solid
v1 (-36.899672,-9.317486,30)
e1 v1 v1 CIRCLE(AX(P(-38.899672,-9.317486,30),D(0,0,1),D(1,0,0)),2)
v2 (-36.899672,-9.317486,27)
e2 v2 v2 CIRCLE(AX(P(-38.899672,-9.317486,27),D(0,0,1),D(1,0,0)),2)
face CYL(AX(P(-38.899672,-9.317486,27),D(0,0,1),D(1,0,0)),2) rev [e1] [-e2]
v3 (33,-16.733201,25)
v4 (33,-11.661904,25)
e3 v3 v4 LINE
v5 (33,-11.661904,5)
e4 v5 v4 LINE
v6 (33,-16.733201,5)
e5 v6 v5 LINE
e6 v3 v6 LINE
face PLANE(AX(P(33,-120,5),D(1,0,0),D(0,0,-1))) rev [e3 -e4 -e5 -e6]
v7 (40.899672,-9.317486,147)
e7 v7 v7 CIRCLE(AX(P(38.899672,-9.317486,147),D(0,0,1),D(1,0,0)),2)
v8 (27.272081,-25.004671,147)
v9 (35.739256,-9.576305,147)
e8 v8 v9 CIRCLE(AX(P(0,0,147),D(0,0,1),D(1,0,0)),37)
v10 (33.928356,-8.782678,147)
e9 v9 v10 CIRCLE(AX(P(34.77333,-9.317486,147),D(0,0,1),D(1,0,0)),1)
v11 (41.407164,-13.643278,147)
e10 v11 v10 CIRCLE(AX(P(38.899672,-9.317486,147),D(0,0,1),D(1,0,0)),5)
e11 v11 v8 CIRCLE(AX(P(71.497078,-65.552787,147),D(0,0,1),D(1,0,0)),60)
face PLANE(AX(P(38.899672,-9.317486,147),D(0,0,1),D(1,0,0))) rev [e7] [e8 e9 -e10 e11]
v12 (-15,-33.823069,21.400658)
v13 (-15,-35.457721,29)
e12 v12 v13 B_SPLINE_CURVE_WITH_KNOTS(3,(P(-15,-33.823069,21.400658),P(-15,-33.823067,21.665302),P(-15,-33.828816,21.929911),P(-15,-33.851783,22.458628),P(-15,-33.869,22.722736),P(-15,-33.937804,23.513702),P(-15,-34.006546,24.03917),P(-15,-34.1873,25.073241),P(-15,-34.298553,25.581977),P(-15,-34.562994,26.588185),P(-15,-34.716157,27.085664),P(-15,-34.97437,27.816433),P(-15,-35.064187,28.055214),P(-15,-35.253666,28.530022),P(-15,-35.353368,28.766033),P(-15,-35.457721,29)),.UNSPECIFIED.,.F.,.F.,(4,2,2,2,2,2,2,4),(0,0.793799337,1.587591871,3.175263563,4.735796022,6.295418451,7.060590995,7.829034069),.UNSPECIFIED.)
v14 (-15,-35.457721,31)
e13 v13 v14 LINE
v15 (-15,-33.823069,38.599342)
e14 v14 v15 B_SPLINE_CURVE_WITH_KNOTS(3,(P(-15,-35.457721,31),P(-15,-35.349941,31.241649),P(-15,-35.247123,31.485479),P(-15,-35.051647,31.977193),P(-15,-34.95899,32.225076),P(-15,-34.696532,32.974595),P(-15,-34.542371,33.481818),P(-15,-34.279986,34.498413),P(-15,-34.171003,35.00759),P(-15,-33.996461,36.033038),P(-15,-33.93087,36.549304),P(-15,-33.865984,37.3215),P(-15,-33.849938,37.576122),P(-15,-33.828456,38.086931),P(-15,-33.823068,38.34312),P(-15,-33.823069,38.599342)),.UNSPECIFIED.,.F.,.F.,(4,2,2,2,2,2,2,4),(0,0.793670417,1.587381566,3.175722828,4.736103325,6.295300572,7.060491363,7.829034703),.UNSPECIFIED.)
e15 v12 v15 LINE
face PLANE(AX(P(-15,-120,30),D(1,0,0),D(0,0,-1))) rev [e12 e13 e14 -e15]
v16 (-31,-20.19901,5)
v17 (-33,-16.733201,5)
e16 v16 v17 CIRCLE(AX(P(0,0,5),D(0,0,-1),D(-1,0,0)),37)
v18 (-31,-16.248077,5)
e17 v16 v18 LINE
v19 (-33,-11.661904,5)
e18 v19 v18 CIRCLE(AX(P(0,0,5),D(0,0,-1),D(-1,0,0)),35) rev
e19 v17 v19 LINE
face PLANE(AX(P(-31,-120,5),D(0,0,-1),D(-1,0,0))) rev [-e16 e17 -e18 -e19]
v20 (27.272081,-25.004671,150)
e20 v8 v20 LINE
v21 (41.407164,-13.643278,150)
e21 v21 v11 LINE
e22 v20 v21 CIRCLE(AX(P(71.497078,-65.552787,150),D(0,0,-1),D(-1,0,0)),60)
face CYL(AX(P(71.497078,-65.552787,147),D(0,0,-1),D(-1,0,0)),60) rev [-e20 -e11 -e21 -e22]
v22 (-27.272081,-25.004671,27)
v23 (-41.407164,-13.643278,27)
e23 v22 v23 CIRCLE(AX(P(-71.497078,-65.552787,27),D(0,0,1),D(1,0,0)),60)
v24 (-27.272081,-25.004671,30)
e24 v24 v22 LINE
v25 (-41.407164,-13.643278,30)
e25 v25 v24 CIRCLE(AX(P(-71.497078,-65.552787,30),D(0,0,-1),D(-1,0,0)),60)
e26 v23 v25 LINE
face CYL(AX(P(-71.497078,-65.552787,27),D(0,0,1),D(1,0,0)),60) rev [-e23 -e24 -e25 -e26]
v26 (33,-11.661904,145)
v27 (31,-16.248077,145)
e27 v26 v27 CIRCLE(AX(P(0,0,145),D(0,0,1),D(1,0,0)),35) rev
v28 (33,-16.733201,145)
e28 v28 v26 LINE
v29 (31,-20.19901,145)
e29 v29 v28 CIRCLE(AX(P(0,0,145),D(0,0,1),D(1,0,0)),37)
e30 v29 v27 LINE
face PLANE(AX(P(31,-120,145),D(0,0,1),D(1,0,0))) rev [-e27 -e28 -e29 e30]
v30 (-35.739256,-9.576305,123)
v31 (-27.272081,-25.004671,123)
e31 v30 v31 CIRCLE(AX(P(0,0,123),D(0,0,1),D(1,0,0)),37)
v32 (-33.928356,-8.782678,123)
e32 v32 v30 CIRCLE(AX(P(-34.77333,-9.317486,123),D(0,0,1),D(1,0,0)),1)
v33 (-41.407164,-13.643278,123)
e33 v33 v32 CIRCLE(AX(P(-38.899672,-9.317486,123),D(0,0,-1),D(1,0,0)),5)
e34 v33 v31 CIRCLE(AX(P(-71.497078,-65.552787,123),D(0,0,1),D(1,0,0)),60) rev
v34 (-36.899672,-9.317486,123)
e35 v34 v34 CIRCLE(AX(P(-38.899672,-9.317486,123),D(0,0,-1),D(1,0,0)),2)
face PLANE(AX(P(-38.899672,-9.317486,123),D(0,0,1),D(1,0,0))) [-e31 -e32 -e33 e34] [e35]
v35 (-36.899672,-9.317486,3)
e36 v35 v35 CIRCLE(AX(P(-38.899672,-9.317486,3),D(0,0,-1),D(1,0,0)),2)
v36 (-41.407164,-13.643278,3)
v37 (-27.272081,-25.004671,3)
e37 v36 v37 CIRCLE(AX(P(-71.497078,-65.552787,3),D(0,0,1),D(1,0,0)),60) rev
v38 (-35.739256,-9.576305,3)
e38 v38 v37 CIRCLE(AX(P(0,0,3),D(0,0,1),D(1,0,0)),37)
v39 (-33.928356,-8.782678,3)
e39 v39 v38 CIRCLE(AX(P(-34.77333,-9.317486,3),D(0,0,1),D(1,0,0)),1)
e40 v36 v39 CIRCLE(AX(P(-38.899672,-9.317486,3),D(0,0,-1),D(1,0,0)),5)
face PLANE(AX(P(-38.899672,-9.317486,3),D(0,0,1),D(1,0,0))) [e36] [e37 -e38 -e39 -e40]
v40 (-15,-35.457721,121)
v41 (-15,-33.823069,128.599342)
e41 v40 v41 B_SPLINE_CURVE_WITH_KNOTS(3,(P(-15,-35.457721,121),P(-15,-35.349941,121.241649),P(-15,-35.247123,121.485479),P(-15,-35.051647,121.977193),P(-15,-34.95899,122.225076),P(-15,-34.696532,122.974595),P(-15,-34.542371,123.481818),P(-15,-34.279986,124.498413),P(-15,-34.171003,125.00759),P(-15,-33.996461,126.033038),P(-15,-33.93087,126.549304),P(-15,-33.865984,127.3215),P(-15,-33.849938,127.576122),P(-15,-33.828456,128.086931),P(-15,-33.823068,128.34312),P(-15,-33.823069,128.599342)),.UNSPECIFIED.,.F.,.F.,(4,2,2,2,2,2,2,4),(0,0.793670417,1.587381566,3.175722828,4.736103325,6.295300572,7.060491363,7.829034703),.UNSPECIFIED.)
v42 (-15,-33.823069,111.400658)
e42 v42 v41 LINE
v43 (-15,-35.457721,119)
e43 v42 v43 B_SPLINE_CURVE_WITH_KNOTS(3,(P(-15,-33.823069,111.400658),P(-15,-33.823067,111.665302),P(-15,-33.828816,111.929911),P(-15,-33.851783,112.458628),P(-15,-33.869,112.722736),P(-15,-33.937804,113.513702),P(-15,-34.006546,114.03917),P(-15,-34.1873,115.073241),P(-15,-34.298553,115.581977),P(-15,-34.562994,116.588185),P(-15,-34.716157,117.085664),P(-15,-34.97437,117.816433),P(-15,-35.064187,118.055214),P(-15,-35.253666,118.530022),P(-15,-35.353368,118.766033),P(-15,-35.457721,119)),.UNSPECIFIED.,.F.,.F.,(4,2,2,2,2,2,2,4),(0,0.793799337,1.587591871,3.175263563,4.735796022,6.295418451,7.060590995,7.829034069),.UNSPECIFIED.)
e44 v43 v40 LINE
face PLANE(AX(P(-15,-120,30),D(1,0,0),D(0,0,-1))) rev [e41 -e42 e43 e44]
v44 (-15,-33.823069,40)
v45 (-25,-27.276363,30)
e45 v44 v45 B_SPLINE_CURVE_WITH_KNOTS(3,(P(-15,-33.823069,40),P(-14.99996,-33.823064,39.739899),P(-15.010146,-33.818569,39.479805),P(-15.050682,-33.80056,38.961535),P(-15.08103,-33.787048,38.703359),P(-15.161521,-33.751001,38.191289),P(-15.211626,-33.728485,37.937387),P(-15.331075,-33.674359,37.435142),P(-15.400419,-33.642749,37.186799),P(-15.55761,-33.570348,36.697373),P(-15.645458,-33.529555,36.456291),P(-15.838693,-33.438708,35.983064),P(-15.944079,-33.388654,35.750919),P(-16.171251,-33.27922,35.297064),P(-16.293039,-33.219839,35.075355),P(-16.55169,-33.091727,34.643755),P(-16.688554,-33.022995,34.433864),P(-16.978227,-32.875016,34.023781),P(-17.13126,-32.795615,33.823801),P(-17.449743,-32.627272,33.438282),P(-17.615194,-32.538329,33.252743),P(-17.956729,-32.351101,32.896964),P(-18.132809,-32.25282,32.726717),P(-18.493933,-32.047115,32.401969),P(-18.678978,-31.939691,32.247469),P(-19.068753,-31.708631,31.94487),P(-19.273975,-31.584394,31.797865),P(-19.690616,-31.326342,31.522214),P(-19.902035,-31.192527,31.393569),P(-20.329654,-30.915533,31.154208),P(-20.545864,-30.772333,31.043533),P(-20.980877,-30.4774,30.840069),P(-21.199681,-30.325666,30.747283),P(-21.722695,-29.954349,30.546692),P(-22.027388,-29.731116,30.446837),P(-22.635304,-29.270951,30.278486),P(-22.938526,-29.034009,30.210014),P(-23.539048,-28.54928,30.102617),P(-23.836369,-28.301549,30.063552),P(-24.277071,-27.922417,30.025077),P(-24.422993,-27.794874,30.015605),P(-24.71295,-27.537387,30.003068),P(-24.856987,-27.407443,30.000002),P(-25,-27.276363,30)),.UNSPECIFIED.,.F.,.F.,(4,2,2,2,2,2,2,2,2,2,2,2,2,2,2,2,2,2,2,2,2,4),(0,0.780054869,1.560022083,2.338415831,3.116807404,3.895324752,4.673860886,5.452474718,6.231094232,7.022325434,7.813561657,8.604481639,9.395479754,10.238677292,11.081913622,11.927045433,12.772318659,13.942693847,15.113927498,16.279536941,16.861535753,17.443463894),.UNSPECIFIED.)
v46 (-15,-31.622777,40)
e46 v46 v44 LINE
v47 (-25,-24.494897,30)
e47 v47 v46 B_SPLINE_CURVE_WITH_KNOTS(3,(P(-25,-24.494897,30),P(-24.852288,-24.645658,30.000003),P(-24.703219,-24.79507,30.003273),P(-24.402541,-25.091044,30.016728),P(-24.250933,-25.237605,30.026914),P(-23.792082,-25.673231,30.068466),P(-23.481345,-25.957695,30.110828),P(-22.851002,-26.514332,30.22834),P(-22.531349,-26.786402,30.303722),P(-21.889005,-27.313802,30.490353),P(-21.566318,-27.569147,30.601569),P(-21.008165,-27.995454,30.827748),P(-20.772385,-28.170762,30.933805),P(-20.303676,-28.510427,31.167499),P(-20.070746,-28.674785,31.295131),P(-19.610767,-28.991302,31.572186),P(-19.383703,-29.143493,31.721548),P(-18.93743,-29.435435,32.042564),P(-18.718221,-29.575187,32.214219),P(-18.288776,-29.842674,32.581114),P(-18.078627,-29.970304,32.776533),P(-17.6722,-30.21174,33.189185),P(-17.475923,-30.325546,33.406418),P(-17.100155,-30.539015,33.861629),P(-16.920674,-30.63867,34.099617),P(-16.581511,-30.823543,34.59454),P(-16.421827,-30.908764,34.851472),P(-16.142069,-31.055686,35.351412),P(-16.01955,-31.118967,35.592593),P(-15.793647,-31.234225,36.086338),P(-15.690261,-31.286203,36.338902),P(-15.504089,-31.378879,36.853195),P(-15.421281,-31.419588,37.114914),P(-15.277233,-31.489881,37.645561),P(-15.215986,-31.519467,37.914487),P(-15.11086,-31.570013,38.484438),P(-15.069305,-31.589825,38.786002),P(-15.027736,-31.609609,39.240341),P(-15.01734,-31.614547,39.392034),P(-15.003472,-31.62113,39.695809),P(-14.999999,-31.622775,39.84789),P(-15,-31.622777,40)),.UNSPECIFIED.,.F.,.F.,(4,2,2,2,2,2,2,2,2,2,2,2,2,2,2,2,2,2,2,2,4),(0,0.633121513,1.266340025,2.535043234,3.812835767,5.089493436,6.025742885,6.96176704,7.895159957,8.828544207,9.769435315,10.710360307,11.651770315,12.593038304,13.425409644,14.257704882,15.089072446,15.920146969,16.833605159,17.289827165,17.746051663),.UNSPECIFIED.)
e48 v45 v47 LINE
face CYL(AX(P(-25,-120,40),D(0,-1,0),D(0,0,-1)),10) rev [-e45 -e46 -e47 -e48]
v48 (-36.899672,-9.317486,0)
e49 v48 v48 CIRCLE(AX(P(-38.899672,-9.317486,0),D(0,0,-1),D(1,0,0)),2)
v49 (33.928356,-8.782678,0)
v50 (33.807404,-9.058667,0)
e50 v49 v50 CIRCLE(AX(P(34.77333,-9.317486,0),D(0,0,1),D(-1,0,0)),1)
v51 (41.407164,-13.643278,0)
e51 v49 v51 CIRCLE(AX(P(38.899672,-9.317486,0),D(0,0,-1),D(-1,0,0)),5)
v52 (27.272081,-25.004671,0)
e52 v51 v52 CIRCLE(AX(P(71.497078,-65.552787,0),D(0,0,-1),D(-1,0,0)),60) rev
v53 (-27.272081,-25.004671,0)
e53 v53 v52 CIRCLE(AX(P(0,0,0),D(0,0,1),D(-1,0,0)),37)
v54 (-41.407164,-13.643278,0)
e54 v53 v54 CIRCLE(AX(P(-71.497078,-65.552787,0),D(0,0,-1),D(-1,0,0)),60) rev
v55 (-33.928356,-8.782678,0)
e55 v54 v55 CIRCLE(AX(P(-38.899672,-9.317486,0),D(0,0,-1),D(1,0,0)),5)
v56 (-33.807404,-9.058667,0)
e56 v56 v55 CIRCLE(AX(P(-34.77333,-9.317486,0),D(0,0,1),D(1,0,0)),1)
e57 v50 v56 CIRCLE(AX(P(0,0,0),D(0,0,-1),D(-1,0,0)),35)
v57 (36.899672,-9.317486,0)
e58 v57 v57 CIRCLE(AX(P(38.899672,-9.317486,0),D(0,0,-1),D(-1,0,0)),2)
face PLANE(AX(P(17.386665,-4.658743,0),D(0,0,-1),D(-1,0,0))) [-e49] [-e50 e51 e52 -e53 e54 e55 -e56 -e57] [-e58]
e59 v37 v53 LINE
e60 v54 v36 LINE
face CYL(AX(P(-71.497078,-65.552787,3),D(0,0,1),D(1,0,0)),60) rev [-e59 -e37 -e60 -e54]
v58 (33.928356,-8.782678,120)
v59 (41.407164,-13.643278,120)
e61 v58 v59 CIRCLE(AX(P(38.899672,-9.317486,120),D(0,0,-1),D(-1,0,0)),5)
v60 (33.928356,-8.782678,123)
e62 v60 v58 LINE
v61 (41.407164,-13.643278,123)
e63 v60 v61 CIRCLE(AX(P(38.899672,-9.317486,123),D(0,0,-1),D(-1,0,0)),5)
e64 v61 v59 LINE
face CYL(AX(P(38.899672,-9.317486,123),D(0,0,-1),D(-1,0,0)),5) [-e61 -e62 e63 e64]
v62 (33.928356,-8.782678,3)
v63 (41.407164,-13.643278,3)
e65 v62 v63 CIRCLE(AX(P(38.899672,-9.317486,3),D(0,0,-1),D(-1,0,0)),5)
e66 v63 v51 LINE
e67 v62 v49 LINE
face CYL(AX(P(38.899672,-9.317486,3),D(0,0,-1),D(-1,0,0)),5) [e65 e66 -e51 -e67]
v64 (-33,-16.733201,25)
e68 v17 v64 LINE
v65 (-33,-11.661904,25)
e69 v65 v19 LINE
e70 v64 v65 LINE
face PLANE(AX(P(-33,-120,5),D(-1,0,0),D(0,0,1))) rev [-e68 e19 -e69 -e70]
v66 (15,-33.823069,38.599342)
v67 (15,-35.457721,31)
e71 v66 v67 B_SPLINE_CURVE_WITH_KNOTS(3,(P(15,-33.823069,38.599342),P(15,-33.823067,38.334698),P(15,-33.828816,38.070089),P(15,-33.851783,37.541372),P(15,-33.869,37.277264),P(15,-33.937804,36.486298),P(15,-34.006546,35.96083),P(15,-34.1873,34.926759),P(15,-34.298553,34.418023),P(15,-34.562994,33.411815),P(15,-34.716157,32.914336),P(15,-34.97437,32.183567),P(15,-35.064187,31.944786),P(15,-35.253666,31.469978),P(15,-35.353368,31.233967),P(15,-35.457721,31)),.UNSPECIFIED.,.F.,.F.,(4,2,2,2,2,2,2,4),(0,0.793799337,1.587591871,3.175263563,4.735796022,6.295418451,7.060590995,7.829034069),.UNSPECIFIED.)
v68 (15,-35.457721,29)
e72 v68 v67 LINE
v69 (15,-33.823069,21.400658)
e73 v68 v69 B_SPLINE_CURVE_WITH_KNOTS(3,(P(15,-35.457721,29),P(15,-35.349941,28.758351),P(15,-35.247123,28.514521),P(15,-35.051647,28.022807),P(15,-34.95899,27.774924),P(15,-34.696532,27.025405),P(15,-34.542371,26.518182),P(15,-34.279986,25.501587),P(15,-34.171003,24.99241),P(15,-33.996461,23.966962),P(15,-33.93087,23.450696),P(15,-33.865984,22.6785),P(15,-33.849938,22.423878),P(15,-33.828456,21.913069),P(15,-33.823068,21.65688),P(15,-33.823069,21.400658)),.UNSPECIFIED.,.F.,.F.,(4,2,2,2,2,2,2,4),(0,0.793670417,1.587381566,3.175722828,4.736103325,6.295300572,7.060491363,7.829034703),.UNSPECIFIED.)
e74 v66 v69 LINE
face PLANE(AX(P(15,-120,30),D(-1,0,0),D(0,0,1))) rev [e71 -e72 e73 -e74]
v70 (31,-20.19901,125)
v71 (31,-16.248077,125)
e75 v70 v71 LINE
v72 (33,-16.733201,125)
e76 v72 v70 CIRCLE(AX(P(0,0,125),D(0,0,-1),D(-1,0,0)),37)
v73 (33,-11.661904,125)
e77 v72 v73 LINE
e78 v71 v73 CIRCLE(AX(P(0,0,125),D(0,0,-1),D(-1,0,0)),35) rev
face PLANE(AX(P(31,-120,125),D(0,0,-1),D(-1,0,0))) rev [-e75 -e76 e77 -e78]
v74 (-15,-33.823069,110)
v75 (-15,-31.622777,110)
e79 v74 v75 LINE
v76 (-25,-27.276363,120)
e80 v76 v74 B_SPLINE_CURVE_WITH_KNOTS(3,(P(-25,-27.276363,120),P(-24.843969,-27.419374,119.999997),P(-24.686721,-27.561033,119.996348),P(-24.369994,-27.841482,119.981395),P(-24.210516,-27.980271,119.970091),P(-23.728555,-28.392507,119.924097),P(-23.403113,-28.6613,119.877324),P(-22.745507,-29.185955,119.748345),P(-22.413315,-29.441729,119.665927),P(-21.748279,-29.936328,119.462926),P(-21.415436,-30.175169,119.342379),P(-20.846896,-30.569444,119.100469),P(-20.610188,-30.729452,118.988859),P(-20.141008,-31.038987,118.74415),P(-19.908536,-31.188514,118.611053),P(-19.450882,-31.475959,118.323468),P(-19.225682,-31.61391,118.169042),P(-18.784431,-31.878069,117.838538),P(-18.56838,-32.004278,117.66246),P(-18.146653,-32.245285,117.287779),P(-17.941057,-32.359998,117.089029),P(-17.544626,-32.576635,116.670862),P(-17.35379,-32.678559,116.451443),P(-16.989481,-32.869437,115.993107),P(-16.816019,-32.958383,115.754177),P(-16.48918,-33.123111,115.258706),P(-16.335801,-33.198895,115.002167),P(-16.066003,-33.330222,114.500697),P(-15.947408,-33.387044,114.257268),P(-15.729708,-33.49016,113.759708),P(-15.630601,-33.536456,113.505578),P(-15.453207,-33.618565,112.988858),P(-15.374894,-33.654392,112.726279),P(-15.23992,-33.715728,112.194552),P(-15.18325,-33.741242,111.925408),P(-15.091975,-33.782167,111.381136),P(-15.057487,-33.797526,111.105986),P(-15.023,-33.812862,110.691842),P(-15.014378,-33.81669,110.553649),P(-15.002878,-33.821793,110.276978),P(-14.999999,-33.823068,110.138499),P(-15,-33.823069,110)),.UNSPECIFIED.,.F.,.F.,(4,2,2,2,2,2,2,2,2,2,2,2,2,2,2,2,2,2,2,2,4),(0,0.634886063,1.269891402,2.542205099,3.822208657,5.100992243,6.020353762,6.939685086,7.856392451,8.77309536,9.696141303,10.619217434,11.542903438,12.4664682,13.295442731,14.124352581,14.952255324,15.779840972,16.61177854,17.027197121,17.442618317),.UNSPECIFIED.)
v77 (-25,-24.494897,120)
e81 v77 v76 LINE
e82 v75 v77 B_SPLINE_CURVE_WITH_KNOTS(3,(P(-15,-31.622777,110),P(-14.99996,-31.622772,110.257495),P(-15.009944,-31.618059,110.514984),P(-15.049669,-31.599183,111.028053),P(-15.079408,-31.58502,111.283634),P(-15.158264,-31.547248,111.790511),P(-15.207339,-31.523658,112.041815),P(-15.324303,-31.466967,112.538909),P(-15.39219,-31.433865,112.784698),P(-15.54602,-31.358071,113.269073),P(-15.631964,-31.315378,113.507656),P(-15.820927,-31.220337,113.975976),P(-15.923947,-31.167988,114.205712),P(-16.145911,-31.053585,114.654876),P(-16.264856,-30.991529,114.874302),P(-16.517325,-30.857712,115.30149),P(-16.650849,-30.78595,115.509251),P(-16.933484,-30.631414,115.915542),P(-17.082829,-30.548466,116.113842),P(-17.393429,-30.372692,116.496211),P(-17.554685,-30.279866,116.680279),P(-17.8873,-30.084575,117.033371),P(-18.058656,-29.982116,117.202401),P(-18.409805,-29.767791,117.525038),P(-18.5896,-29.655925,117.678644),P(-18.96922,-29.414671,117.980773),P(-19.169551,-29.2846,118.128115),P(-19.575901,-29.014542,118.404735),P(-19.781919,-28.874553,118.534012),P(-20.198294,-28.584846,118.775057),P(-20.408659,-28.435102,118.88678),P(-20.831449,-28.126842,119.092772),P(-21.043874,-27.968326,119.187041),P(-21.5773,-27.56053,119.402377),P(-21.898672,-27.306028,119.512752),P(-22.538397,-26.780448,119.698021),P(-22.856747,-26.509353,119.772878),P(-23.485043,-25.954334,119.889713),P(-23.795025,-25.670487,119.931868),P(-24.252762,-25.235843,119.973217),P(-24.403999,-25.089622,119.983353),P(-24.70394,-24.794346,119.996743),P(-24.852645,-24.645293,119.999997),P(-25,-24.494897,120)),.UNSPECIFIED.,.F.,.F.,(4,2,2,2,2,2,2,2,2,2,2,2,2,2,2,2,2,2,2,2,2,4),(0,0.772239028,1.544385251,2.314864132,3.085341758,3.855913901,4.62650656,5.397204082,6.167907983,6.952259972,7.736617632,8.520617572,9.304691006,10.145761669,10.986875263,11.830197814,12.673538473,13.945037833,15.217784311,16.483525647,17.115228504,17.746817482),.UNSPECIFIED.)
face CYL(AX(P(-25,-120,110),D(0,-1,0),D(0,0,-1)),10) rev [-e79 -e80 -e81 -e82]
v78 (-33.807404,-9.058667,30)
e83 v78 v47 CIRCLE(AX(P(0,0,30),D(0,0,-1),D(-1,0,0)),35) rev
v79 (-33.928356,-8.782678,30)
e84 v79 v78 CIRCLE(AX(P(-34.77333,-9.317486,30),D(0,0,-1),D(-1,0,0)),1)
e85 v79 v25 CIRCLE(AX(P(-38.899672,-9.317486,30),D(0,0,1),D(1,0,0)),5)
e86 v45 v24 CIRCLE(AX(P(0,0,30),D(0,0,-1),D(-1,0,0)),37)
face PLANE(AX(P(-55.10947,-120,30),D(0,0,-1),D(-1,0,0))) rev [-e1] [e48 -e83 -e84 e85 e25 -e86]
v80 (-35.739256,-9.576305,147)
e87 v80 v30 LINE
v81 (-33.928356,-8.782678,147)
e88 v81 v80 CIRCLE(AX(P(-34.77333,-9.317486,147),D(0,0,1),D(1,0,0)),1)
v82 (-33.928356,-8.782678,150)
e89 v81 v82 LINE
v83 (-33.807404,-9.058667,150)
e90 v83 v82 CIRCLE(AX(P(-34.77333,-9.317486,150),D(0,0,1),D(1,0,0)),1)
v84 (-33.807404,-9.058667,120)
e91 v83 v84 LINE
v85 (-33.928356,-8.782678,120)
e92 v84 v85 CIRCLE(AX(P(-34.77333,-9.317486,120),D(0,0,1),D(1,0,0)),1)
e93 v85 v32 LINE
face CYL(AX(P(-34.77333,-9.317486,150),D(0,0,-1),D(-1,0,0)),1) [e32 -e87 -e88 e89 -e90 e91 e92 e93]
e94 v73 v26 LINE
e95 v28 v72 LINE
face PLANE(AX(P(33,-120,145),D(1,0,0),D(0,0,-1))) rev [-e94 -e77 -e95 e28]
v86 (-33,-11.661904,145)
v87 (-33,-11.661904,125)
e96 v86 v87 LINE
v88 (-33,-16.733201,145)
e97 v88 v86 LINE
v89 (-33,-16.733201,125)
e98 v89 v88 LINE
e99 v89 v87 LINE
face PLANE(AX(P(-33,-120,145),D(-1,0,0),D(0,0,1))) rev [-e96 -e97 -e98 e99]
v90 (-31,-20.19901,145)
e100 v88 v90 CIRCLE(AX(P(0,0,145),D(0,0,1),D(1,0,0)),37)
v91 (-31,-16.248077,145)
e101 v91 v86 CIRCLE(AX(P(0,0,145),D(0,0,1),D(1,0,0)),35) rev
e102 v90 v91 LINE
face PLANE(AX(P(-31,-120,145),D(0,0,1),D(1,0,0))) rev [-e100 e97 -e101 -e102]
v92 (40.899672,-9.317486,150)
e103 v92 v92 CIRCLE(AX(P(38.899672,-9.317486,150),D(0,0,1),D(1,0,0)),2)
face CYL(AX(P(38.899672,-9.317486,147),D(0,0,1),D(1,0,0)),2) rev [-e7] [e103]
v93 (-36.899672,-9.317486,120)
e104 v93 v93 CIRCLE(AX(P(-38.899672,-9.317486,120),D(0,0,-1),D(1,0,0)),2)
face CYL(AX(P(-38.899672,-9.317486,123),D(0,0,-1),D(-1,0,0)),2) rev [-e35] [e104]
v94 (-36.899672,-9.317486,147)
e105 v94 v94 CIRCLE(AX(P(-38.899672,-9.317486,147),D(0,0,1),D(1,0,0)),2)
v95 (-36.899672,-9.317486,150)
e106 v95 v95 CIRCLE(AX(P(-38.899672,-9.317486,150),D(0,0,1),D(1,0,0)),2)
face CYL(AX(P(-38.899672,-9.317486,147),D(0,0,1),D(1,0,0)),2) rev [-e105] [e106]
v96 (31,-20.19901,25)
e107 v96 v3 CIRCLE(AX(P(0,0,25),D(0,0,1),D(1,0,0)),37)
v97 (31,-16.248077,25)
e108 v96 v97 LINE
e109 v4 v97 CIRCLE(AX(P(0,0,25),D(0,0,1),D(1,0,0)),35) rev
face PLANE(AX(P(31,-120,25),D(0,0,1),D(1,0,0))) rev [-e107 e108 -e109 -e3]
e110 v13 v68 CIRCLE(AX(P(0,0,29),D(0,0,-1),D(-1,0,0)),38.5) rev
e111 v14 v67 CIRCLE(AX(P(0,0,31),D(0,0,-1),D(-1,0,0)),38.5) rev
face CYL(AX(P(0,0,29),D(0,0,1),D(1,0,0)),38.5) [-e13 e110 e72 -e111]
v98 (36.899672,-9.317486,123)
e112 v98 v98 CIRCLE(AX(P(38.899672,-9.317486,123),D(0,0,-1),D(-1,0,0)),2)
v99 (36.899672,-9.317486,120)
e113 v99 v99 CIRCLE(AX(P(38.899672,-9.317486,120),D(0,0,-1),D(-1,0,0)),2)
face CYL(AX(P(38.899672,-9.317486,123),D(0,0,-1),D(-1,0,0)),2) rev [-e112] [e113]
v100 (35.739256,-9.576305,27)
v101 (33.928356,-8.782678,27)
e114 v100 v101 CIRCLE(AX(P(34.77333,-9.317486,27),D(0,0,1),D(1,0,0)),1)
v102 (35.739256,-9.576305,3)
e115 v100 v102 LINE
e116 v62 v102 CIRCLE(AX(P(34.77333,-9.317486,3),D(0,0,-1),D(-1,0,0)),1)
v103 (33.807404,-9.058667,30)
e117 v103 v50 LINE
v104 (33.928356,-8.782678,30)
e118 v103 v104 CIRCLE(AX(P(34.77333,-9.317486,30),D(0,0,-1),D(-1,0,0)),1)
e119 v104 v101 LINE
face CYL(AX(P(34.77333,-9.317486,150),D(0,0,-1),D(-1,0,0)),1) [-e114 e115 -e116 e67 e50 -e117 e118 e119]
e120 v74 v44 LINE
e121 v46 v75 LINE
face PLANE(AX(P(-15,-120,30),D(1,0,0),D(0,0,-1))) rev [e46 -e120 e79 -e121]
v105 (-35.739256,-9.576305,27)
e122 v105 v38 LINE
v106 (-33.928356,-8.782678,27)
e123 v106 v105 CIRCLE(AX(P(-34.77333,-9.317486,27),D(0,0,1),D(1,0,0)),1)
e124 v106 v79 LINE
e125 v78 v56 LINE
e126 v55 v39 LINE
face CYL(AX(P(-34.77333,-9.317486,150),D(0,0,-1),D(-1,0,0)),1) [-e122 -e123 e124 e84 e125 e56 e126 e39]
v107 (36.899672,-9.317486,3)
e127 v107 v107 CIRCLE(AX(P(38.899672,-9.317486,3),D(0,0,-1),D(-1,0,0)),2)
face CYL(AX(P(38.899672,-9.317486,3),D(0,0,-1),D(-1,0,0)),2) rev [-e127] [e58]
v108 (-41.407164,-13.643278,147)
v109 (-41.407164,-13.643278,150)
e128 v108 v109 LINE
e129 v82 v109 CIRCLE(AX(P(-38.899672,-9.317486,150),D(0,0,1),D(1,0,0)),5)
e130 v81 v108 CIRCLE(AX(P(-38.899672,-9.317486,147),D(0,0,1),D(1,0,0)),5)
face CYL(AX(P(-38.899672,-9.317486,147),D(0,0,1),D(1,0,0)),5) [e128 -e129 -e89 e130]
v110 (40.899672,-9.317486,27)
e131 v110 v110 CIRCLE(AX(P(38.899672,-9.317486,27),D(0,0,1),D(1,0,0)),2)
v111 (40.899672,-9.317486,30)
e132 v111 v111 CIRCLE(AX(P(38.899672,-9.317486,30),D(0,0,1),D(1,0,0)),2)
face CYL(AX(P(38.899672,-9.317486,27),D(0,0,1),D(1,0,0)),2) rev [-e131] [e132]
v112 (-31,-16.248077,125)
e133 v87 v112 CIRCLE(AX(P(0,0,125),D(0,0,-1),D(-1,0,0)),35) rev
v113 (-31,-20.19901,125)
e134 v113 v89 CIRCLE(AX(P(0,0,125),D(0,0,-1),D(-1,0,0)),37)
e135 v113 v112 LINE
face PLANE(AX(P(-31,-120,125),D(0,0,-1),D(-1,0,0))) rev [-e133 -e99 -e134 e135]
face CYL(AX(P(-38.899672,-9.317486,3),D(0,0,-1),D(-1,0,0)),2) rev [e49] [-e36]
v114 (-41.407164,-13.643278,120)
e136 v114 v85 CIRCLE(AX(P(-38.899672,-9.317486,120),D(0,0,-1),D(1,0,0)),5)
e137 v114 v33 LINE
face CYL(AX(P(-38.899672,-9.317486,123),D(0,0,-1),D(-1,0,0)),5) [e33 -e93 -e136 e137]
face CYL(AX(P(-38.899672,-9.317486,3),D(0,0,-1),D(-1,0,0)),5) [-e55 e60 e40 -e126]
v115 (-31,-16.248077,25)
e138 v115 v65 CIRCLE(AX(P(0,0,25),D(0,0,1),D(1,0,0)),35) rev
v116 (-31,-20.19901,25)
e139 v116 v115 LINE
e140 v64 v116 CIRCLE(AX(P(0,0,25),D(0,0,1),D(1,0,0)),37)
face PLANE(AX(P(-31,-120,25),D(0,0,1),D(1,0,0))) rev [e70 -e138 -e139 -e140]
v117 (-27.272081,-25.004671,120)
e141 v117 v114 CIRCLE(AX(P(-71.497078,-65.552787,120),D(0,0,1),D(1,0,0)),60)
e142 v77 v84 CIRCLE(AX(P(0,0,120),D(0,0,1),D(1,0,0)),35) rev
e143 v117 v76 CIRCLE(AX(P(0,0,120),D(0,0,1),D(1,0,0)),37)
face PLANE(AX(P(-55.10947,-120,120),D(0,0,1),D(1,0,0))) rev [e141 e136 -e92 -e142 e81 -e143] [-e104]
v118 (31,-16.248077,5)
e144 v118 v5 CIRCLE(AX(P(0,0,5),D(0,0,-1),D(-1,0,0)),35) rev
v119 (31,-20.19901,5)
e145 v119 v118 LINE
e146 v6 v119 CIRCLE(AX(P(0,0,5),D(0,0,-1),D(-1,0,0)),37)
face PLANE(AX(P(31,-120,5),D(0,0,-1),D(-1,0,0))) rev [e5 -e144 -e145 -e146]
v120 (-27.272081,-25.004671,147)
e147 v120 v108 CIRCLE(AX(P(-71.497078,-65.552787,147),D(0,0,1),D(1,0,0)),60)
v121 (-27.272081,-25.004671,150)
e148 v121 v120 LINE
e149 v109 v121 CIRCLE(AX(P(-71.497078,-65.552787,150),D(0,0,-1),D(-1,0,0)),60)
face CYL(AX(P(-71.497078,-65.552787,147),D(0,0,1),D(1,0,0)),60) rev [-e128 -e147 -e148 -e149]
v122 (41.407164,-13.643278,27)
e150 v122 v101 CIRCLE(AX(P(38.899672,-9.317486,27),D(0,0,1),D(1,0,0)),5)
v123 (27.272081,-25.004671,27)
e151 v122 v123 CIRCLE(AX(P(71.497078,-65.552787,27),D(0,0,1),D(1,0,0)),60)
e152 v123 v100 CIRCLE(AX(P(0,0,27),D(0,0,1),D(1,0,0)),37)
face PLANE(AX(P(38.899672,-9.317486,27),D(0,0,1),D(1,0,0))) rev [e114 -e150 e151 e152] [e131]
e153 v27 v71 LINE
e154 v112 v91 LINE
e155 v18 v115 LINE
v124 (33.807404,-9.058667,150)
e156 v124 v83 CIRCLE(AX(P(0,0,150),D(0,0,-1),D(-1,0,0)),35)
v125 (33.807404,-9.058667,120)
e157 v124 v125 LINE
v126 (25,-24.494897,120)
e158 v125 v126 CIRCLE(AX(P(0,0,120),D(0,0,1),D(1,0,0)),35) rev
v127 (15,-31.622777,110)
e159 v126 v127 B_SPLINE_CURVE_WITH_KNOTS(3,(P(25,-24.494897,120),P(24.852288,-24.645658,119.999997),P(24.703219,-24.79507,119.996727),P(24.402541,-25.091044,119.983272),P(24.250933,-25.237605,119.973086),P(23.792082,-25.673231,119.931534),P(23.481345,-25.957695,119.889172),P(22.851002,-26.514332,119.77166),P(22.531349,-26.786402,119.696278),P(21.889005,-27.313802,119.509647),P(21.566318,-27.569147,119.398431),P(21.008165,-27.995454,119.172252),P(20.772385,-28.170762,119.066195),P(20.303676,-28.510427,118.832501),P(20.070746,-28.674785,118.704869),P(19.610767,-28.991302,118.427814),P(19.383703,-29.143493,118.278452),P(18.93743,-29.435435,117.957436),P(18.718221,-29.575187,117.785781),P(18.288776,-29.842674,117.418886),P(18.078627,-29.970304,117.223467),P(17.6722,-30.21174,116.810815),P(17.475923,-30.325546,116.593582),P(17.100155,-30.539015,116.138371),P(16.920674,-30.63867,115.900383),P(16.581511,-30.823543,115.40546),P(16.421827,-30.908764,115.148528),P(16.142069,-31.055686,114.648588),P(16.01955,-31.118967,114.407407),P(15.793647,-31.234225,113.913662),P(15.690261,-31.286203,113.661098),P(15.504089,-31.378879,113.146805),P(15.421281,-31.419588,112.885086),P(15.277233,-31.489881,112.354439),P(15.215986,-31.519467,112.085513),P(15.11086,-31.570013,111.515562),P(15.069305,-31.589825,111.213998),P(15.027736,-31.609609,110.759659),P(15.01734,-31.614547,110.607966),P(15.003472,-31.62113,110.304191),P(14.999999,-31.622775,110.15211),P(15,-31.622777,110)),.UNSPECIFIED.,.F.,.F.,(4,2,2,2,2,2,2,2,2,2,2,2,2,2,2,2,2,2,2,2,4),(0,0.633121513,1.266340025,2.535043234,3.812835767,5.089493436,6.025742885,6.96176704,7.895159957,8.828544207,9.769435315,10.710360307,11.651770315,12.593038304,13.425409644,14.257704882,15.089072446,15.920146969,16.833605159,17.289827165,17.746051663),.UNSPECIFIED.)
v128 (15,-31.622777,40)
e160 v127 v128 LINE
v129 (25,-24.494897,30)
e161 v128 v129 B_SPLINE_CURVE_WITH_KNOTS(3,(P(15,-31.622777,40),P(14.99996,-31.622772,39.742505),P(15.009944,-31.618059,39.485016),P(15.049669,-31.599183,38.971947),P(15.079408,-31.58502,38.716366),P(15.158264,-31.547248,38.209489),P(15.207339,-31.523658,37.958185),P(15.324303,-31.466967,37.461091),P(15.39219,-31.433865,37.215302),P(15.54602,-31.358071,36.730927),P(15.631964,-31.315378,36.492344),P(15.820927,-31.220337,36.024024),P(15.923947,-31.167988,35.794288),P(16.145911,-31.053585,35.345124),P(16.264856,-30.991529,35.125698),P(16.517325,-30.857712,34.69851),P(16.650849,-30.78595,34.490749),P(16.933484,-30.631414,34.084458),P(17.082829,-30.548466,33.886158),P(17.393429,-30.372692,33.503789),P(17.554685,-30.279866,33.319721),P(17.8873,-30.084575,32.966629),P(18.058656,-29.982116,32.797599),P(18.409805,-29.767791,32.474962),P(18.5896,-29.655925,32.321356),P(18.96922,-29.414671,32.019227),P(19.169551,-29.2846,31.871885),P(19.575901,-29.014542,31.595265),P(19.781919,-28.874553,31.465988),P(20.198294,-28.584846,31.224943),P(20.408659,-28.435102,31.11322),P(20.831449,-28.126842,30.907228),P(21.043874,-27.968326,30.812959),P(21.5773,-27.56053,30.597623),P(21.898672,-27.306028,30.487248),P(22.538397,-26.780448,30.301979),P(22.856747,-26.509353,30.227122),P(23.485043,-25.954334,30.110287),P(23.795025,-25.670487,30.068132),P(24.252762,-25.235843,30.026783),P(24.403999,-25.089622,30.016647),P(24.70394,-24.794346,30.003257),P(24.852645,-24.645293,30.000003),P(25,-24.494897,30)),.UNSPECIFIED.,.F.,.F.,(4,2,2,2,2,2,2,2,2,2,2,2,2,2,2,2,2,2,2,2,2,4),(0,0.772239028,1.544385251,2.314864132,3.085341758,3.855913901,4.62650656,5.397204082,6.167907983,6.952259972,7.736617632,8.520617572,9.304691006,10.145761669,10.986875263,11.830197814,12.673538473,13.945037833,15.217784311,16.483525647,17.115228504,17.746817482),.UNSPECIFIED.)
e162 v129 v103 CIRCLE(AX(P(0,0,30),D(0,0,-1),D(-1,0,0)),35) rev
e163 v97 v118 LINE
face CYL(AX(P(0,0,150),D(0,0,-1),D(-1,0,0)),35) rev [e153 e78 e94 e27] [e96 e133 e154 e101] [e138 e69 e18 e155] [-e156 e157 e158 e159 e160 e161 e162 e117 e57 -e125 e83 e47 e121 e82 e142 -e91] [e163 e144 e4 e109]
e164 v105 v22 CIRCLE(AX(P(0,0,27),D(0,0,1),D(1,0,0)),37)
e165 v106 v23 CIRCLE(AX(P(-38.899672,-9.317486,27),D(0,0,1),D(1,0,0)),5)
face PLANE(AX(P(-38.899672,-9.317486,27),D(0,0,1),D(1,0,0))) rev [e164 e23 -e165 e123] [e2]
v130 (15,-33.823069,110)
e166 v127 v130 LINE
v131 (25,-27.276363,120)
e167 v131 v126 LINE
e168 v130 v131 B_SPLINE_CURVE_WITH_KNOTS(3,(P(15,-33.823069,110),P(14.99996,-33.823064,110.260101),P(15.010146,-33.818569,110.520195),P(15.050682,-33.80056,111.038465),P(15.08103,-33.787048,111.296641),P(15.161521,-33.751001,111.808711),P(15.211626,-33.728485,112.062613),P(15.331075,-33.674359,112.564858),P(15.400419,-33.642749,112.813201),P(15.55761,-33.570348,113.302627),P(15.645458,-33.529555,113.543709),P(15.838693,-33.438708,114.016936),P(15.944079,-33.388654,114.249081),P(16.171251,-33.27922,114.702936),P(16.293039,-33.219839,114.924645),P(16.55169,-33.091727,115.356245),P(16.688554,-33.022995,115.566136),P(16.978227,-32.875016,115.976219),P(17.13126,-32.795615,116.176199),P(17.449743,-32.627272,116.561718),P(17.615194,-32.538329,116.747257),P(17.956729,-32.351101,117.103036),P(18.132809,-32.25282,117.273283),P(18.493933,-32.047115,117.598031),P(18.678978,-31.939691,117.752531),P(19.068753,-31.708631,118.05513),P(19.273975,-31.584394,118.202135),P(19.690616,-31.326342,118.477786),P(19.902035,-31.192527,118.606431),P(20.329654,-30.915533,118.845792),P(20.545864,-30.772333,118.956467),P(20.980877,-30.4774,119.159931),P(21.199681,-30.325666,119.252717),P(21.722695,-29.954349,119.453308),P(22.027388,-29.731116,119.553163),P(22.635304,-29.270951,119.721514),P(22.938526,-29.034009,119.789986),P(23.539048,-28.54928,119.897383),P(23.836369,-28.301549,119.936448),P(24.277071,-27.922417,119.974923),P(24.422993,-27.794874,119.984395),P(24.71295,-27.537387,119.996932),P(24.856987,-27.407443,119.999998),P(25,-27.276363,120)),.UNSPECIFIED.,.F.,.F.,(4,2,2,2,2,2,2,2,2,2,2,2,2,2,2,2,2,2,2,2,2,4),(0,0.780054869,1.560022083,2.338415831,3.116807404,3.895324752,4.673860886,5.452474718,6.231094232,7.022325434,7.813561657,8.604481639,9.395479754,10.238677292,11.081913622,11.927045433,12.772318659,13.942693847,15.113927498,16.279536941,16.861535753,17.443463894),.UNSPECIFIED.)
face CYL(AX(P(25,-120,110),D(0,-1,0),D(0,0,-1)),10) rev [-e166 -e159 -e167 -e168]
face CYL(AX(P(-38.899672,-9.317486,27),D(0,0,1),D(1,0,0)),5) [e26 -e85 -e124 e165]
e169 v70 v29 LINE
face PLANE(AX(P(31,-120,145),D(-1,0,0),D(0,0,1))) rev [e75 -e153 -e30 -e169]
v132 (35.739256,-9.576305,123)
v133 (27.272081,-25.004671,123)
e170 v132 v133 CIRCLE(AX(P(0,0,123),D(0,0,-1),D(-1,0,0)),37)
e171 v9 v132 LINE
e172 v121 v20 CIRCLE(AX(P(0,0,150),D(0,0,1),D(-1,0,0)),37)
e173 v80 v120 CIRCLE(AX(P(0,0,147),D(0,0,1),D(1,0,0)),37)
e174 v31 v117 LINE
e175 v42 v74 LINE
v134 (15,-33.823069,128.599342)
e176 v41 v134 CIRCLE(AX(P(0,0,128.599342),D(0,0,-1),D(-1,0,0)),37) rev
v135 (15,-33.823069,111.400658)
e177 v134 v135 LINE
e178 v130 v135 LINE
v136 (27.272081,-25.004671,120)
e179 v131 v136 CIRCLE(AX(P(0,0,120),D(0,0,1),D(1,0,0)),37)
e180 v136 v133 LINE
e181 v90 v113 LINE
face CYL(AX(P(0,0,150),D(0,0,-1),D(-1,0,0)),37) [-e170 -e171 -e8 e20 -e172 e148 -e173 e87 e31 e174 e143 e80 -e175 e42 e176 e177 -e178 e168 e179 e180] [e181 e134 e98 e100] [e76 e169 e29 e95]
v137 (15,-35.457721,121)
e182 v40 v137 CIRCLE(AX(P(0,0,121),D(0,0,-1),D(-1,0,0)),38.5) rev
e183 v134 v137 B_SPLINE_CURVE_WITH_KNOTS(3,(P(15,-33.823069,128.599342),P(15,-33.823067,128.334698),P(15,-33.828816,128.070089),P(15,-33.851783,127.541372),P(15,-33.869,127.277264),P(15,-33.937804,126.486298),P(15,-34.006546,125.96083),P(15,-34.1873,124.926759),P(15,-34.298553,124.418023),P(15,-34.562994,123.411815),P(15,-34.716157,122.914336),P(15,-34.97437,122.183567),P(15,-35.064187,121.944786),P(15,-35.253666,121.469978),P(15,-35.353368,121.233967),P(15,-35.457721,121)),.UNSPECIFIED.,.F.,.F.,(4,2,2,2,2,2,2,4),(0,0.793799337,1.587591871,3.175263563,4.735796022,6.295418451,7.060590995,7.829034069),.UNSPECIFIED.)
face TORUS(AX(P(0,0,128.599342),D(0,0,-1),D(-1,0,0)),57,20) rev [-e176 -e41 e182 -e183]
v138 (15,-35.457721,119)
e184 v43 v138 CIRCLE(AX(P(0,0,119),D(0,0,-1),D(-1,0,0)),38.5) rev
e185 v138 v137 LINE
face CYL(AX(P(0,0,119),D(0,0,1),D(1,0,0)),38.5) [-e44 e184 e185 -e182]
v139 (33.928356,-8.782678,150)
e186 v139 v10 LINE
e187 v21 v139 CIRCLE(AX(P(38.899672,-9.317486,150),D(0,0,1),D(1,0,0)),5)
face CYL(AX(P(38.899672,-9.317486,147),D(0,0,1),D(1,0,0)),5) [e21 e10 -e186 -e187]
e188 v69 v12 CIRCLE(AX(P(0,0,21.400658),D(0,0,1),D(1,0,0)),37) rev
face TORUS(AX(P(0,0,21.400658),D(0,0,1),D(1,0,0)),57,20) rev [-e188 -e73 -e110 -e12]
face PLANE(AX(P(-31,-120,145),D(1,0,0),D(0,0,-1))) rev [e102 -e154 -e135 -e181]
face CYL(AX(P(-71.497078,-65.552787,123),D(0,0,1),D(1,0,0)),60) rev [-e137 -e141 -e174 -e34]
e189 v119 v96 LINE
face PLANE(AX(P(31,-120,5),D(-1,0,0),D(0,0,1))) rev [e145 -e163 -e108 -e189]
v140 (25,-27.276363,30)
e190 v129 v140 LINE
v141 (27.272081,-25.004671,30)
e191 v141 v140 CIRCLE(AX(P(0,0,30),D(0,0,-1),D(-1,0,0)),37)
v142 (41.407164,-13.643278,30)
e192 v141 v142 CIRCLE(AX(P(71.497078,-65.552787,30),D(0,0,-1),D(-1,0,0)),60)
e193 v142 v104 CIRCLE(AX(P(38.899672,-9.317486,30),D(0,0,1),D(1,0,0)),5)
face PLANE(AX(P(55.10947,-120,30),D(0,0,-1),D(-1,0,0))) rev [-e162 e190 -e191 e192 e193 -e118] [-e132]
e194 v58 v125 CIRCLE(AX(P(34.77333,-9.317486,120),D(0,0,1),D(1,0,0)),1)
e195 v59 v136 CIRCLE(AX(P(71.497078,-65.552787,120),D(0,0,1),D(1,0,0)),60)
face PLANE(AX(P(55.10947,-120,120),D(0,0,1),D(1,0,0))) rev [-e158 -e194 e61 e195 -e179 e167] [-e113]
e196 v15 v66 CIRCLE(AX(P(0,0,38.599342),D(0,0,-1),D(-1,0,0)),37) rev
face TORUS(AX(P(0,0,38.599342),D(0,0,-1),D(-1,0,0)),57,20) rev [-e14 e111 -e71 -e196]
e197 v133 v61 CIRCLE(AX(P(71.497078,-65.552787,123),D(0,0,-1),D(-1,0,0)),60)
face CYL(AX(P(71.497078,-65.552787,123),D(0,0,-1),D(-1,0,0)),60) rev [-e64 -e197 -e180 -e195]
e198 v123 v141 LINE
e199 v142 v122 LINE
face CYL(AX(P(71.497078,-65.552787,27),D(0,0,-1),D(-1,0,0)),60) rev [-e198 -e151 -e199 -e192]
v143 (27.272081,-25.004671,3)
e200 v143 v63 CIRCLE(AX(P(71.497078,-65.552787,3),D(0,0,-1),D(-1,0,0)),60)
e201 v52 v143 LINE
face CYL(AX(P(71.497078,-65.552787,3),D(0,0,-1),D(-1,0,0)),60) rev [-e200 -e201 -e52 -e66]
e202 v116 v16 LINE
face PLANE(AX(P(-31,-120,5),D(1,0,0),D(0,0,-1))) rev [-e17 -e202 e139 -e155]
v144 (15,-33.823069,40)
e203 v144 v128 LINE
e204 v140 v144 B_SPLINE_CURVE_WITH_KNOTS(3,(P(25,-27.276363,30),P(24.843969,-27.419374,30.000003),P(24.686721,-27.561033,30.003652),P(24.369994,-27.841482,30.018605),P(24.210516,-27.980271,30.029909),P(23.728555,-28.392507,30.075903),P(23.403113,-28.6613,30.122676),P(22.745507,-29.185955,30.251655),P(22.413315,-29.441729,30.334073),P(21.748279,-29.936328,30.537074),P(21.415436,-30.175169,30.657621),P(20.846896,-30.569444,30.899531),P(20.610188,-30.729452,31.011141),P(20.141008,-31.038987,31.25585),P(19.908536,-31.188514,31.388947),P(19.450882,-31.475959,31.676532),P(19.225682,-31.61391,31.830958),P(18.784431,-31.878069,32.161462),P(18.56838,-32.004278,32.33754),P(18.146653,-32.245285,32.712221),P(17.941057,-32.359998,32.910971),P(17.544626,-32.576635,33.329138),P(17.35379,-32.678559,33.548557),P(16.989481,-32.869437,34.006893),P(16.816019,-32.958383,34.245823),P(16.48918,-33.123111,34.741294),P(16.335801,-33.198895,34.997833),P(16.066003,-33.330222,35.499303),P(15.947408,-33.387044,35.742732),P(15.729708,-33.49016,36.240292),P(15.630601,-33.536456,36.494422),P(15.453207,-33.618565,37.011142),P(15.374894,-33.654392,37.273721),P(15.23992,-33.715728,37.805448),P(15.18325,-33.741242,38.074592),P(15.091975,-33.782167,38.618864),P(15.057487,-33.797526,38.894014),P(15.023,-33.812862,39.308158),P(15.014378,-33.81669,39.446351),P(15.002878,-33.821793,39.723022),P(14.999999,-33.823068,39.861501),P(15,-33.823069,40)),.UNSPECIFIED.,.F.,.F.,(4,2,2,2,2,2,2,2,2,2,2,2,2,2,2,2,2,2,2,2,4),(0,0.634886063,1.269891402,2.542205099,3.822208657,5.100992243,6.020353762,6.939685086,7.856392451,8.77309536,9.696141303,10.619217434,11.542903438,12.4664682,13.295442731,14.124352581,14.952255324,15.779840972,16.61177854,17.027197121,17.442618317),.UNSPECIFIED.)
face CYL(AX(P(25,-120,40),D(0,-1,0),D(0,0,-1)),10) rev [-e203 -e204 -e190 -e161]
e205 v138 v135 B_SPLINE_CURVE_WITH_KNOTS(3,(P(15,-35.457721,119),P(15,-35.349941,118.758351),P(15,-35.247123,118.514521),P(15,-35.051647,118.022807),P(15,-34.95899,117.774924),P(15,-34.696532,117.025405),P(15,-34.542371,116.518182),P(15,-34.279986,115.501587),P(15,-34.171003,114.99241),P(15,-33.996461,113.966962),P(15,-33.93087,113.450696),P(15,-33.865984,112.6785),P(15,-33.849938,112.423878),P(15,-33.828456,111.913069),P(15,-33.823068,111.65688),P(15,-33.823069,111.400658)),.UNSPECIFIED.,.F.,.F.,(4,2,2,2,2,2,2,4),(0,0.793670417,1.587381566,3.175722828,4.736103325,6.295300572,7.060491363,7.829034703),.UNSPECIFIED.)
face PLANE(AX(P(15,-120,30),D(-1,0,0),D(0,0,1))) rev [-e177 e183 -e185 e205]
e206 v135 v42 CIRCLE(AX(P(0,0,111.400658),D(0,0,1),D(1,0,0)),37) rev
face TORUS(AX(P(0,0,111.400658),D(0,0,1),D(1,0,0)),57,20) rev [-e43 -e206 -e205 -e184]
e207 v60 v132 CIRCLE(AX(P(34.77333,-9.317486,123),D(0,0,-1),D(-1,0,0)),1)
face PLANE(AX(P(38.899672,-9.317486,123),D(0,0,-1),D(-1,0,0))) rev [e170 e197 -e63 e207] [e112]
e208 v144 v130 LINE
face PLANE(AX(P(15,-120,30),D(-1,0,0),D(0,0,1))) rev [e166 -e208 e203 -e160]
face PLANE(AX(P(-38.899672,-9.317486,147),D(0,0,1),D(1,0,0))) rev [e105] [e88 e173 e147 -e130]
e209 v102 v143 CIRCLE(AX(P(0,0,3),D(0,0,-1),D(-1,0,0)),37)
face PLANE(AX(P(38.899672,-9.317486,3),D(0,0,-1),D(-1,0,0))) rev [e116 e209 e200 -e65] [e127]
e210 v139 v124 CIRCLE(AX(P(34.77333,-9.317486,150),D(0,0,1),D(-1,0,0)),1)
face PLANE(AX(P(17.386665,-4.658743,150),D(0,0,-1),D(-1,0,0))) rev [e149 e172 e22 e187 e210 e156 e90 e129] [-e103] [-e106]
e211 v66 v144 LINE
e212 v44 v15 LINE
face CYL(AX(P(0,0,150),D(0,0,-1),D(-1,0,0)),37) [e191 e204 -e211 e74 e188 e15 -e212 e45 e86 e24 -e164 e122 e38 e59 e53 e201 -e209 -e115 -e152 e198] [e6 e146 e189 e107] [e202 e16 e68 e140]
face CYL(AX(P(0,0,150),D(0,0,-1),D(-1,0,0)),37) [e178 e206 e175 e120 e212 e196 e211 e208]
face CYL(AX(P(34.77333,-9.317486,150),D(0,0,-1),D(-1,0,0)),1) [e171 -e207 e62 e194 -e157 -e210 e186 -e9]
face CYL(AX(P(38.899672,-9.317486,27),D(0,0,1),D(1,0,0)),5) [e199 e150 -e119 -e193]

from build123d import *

# Parameters (mm, degrees)
BOSS_EXTRUDE1_DEPTH    = 150
SKETCH2_W              = 40.109469753
SKETCH2_H              = 90
SKETCH2_W_2            = 2
SKETCH2_H_2            = 20
CUT_EXTRUDE1_DEPTH     = 120
SKETCH3_R              = 5
SKETCH3_R_2            = 2
BOSS_EXTRUDE2_DEPTH    = 3
BOSS_EXTRUDE3_START    = -3
SKETCH4_R              = 5
SKETCH4_R_2            = 2
BOSS_EXTRUDE3_DEPTH    = 3
LPATTERN1_COUNT        = 2
LPATTERN1_PITCH        = 120
FILLET1_R              = 60
BOSS_EXTRUDE4_DEPTH    = 1
FILLET2_R              = 20
LPATTERN2_COUNT        = 2
LPATTERN2_PITCH        = 90
FILLET2_OF_LPATTERN2_R = 20
FILLET3_R              = 10


with BuildPart() as part:
    # Sketch1 → Boss-Extrude1 (new body)
    with BuildSketch(Plane.XY):
        with BuildLine():
            ThreePointArc((33.80740392, -9.058666579), (0, -35), (-33.80740392, -9.058666579))
            ThreePointArc((-33.80740392, -9.058666579), (-35.032148792, -8.351559797), (-35.739255573, -9.576304669))
            ThreePointArc((-35.739255573, -9.576304669), (0, -37), (35.739255573, -9.576304669))
            ThreePointArc((35.739255573, -9.576304669), (35.032148792, -8.351559797), (33.80740392, -9.058666579))
        make_face()
    extrude(amount=BOSS_EXTRUDE1_DEPTH)

    # Sketch2 → Cut-Extrude1 (cut)
    with BuildSketch(Plane(origin=(0, 0, 0), x_dir=(1, 0, 0), z_dir=(0, 1, 0))):
        with Locations((-35.054734877, -75)):
            Rectangle(SKETCH2_W, SKETCH2_H)
        with Locations((35.054734877, -75)):
            Rectangle(SKETCH2_W, SKETCH2_H)
        with Locations((32, -15)):
            Rectangle(SKETCH2_W_2, SKETCH2_H_2)
        with Locations((-32, -15)):
            Rectangle(SKETCH2_W_2, SKETCH2_H_2)
        with Locations((-32, -135)):
            Rectangle(SKETCH2_W_2, SKETCH2_H_2)
        with Locations((32, -135)):
            Rectangle(SKETCH2_W_2, SKETCH2_H_2)
    extrude(amount=-CUT_EXTRUDE1_DEPTH, mode=Mode.SUBTRACT)

    # Sketch3 → Boss-Extrude2 (add)
    # profile 1 of 2: a face of its own
    with BuildSketch(Plane(origin=(0, 0, 0), x_dir=(-1, 0, 0), z_dir=(0, 0, -1))):
        with Locations((-38.899671742, -9.317485624)):
            Circle(SKETCH3_R)
        with Locations((-38.899671742, -9.317485624)):
            Circle(SKETCH3_R_2, mode=Mode.SUBTRACT)
    # profile 2 of 2: a face of its own
    with BuildSketch(Plane(origin=(0, 0, 0), x_dir=(-1, 0, 0), z_dir=(0, 0, -1))):
        with Locations((38.899671742, -9.317485624)):
            Circle(SKETCH3_R)
        with Locations(Location((38.899671742, -9.317485624, 0), (0, 0, 180))):
            Circle(SKETCH3_R_2, mode=Mode.SUBTRACT)
    boss_extrude2 = extrude(amount=-BOSS_EXTRUDE2_DEPTH)

    # Sketch4 → Boss-Extrude3 (add)
    # profile 1 of 2: a face of its own
    with BuildSketch(Plane.XY.offset(30).offset(BOSS_EXTRUDE3_START)):
        with Locations((-38.899671742, -9.317485624)):
            Circle(SKETCH4_R)
        with Locations((-38.899671742, -9.317485624)):
            Circle(SKETCH4_R_2, mode=Mode.SUBTRACT)
    # profile 2 of 2: a face of its own
    with BuildSketch(Plane.XY.offset(30).offset(BOSS_EXTRUDE3_START)):
        with Locations((38.899671742, -9.317485624)):
            Circle(SKETCH4_R)
        with Locations(Location((38.899671742, -9.317485624, 0), (0, 0, 180))):
            Circle(SKETCH4_R_2, mode=Mode.SUBTRACT)
    boss_extrude3 = extrude(amount=BOSS_EXTRUDE3_DEPTH)

    # LPattern1: Boss-Extrude2, Boss-Extrude3 ×2
    with Locations(*[(0, 0, i * LPATTERN1_PITCH) for i in range(1, LPATTERN1_COUNT)]):
        add(boss_extrude2)
        add(boss_extrude3)

    # Fillet1
    fillet1_edges = [part.edges().sort_by_distance(p)[0] for p in [
        (34.892782732, -12.308278238, 1.5),
        (-34.892782732, -12.308278238, 1.5),
        (-34.892782732, -12.308278238, 28.5),
        (34.892782732, -12.308278238, 28.5),
        (34.892782732, -12.308278238, 121.5),
        (-34.892782732, -12.308278238, 121.5),
        (-34.892782732, -12.308278238, 148.5),
        (34.892782732, -12.308278238, 148.5),
    ]]
    fillet(fillet1_edges, radius=FILLET1_R)

    # Sketch5 → Boss-Extrude4 (add, symmetric)
    with BuildSketch(Plane(origin=(0, 0, 120), x_dir=(-1, 0, 0), z_dir=(0, 0, -1))):
        with BuildLine():
            Line((15, -35.457721303), (15, -34.166982403))
            Line((15, -34.166982403), (15, -31.622776602))
            ThreePointArc((15, -31.622776602), (0, -35), (-15, -31.622776602))
            Line((-15, -31.622776602), (-15, -33.823069051))
            Line((-15, -33.823069051), (-15, -33.951934532))
            Line((-15, -33.951934532), (-15, -35.457721303))
            ThreePointArc((-15, -35.457721303), (0, -38.5), (15, -35.457721303))
        make_face()
    boss_extrude4 = extrude(amount=BOSS_EXTRUDE4_DEPTH, both=True)

    # Fillet2
    # the kernel refuses this fillet: 20 mm, written as the material it adds along each edge
    with BuildSketch(Plane(origin=(0, 0, 121), x_dir=(0.802187271950027, -0.5970725087636956, 0), z_dir=(0.5970725087636956, 0.802187271950027, 0))) as fillet2_piece_1_section:
        with BuildLine():
            CenterArc((57, -7.599342077), FILLET2_R, 157.668354991, 22.331645009)
            Line((38.5, 0), (38.13, 0.151986842))
            ThreePointArc((38.13, 0.151986842), (37.75, 0.4), (37, 0.4))
            Line((37, 0.4), (36.6, 0))
            Line((36.6, 0), (36.6, -7.599342077))
            Line((36.6, -7.599342077), (37, -7.599342077))
        make_face()
    fillet2_piece_1 = revolve(axis=Axis((0, 0, 121), (0, 0, -1)), revolution_arc=106.67896401, mode=Mode.PRIVATE)
    fillet2_piece_1 = split(fillet2_piece_1, bisect_by=Plane(origin=(-15, -37.318777993, 124.714554063), z_dir=(1, 0, 0)), keep=Keep.TOP, mode=Mode.PRIVATE)
    fillet2_piece_1 = split(fillet2_piece_1, bisect_by=Plane(origin=(15, -37.318777993, 124.714554063), z_dir=(-1, 0, 0)), keep=Keep.TOP, mode=Mode.PRIVATE)
    add(fillet2_piece_1)
    with BuildSketch(Plane(origin=(0, 0, 119), x_dir=(0.802187271950027, -0.5970725087636956, 0), z_dir=(0.5970725087636956, 0.802187271950027, 0))) as fillet2_piece_2_section:
        with BuildLine():
            CenterArc((57, 7.599342077), FILLET2_R, 180, 22.331645009)
            Line((37, 7.599342077), (36.6, 7.599342077))
            Line((36.6, 7.599342077), (36.6, 0))
            Line((36.6, 0), (37, -0.4))
            ThreePointArc((37, -0.4), (37.75, -0.4), (38.13, -0.151986842))
            Line((38.13, -0.151986842), (38.5, 0))
        make_face()
    fillet2_piece_2 = revolve(axis=Axis((0, 0, 119), (0, 0, -1)), revolution_arc=106.67896401, mode=Mode.PRIVATE)
    fillet2_piece_2 = split(fillet2_piece_2, bisect_by=Plane(origin=(-15, -37.318777993, 115.285445937), z_dir=(1, 0, 0)), keep=Keep.TOP, mode=Mode.PRIVATE)
    fillet2_piece_2 = split(fillet2_piece_2, bisect_by=Plane(origin=(15, -37.318777993, 115.285445937), z_dir=(-1, 0, 0)), keep=Keep.TOP, mode=Mode.PRIVATE)
    add(fillet2_piece_2)

    # LPattern2: Boss-Extrude4 ×2
    with Locations(*[(0, 0, -i * LPATTERN2_PITCH) for i in range(1, LPATTERN2_COUNT)]):
        add(boss_extrude4)

    # Fillet2 of LPattern2
    # the kernel refuses this fillet: 20 mm, written as the material it adds along each edge
    with BuildSketch(Plane(origin=(0, 0, 31), x_dir=(0.802187271950026, -0.597072508763697, 0), z_dir=(0.597072508763697, 0.802187271950026, 0))) as fillet2_of_lpattern2_piece_1_section:
        with BuildLine():
            CenterArc((57, -7.599342077), FILLET2_OF_LPATTERN2_R, 157.668354991, 22.331645009)
            Line((38.5, 0), (38.13, 0.151986842))
            ThreePointArc((38.13, 0.151986842), (37.75, 0.4), (37, 0.4))
            Line((37, 0.4), (36.6, 0))
            Line((36.6, 0), (36.6, -7.599342077))
            Line((36.6, -7.599342077), (37, -7.599342077))
        make_face()
    fillet2_of_lpattern2_piece_1 = revolve(axis=Axis((0, 0, 31), (0, 0, -1)), revolution_arc=106.67896401, mode=Mode.PRIVATE)
    fillet2_of_lpattern2_piece_1 = split(fillet2_of_lpattern2_piece_1, bisect_by=Plane(origin=(15, -37.318777993, 34.714554063), z_dir=(-1, 0, 0)), keep=Keep.TOP, mode=Mode.PRIVATE)
    fillet2_of_lpattern2_piece_1 = split(fillet2_of_lpattern2_piece_1, bisect_by=Plane(origin=(-15, -37.318777993, 34.714554063), z_dir=(1, 0, 0)), keep=Keep.TOP, mode=Mode.PRIVATE)
    add(fillet2_of_lpattern2_piece_1)
    with BuildSketch(Plane(origin=(0, 0, 29), x_dir=(0.8021872719500256, -0.5970725087636976, 0), z_dir=(0.5970725087636976, 0.8021872719500256, 0))) as fillet2_of_lpattern2_piece_2_section:
        with BuildLine():
            CenterArc((57, 7.599342077), FILLET2_OF_LPATTERN2_R, 180, 22.331645009)
            Line((37, 7.599342077), (36.6, 7.599342077))
            Line((36.6, 7.599342077), (36.6, 0))
            Line((36.6, 0), (37, -0.4))
            ThreePointArc((37, -0.4), (37.75, -0.4), (38.13, -0.151986842))
            Line((38.13, -0.151986842), (38.5, 0))
        make_face()
    fillet2_of_lpattern2_piece_2 = revolve(axis=Axis((0, 0, 29), (0, 0, -1)), revolution_arc=106.67896401, mode=Mode.PRIVATE)
    fillet2_of_lpattern2_piece_2 = split(fillet2_of_lpattern2_piece_2, bisect_by=Plane(origin=(-15, -37.318777993, 25.285445937), z_dir=(1, 0, 0)), keep=Keep.TOP, mode=Mode.PRIVATE)
    fillet2_of_lpattern2_piece_2 = split(fillet2_of_lpattern2_piece_2, bisect_by=Plane(origin=(15, -37.318777993, 25.285445937), z_dir=(-1, 0, 0)), keep=Keep.TOP, mode=Mode.PRIVATE)
    add(fillet2_of_lpattern2_piece_2)

    # Fillet3
    # the kernel refuses this fillet: 10 mm, written as the material it adds along each edge
    with BuildSketch(Plane(origin=(15, -6.622776602, 120), x_dir=(1, 0, 0), z_dir=(0, -1, 0))) as fillet3_piece_1_section:
        with BuildLine():
            CenterArc((FILLET3_R, -FILLET3_R), FILLET3_R, 90, 90)
            Line((0, -FILLET3_R), (0, 0))
            Line((0, 0), (FILLET3_R, 0))
        make_face()
    fillet3_piece_1 = extrude(amount=52.200292449, mode=Mode.PRIVATE)
    fillet3_piece_1 = fillet3_piece_1 - Plane(origin=(0, 0, 117.805122466), x_dir=(0.9659258262890681, -0.25881904510252157, 0), z_dir=(0, 0, -1)) * Cylinder(35, 145, mode=Mode.PRIVATE)
    fillet3_piece_1 = fillet3_piece_1 & Plane(origin=(0, 0, 117.805122466), x_dir=(-0.9659258262890681, -0.25881904510252135, 0), z_dir=(0, 0, -1)) * Cylinder(37, 145, mode=Mode.PRIVATE)
    add(fillet3_piece_1)
    with BuildSketch(Plane(origin=(15, -6.622776602, 30), x_dir=(1, 0, 0), z_dir=(0, -1, 0))) as fillet3_piece_2_section:
        with BuildLine():
            CenterArc((FILLET3_R, FILLET3_R), FILLET3_R, 180, 90)
            Line((0, FILLET3_R), (0, 0))
            Line((0, 0), (FILLET3_R, 0))
        make_face()
    fillet3_piece_2 = extrude(amount=52.200292449, mode=Mode.PRIVATE)
    fillet3_piece_2 = fillet3_piece_2 & Plane(origin=(0, 0, 32.194877534), x_dir=(-0.9659258262890681, -0.25881904510252135, 0), z_dir=(0, 0, -1)) * Cylinder(37, 145, mode=Mode.PRIVATE)
    fillet3_piece_2 = fillet3_piece_2 - Plane(origin=(0, 0, 32.194877534), x_dir=(0.9659258262890681, -0.25881904510252157, 0), z_dir=(0, 0, -1)) * Cylinder(35, 145, mode=Mode.PRIVATE)
    add(fillet3_piece_2)
    with BuildSketch(Plane(origin=(-15, -6.622776602, 30), x_dir=(-1, 0, 0), z_dir=(0, -1, 0))) as fillet3_piece_3_section:
        with BuildLine():
            CenterArc((FILLET3_R, -FILLET3_R), FILLET3_R, 90, 90)
            Line((0, -FILLET3_R), (0, 0))
            Line((0, 0), (FILLET3_R, 0))
        make_face()
    fillet3_piece_3 = extrude(amount=52.200292449, mode=Mode.PRIVATE)
    fillet3_piece_3 = fillet3_piece_3 & Plane(origin=(0, 0, 32.194882502), x_dir=(-0.9659258262890681, -0.25881904510252135, 0), z_dir=(0, 0, -1)) * Cylinder(37, 145, mode=Mode.PRIVATE)
    fillet3_piece_3 = fillet3_piece_3 - Plane(origin=(0, 0, 32.194882502), x_dir=(0.9659258262890681, -0.25881904510252157, 0), z_dir=(0, 0, -1)) * Cylinder(35, 145, mode=Mode.PRIVATE)
    add(fillet3_piece_3)
    with BuildSketch(Plane(origin=(-15, -6.622776602, 120), x_dir=(-1, 0, 0), z_dir=(0, -1, 0))) as fillet3_piece_4_section:
        with BuildLine():
            CenterArc((FILLET3_R, FILLET3_R), FILLET3_R, 180, 90)
            Line((0, FILLET3_R), (0, 0))
            Line((0, 0), (FILLET3_R, 0))
        make_face()
    fillet3_piece_4 = extrude(amount=52.200292449, mode=Mode.PRIVATE)
    fillet3_piece_4 = fillet3_piece_4 - Plane(origin=(0, 0, 117.805117498), x_dir=(0.9659258262890681, -0.25881904510252157, 0), z_dir=(0, 0, -1)) * Cylinder(35, 145, mode=Mode.PRIVATE)
    fillet3_piece_4 = fillet3_piece_4 & Plane(origin=(0, 0, 117.805117498), x_dir=(-0.9659258262890681, -0.25881904510252135, 0), z_dir=(0, 0, -1)) * Cylinder(37, 145, mode=Mode.PRIVATE)
    add(fillet3_piece_4)


solid = part.part
